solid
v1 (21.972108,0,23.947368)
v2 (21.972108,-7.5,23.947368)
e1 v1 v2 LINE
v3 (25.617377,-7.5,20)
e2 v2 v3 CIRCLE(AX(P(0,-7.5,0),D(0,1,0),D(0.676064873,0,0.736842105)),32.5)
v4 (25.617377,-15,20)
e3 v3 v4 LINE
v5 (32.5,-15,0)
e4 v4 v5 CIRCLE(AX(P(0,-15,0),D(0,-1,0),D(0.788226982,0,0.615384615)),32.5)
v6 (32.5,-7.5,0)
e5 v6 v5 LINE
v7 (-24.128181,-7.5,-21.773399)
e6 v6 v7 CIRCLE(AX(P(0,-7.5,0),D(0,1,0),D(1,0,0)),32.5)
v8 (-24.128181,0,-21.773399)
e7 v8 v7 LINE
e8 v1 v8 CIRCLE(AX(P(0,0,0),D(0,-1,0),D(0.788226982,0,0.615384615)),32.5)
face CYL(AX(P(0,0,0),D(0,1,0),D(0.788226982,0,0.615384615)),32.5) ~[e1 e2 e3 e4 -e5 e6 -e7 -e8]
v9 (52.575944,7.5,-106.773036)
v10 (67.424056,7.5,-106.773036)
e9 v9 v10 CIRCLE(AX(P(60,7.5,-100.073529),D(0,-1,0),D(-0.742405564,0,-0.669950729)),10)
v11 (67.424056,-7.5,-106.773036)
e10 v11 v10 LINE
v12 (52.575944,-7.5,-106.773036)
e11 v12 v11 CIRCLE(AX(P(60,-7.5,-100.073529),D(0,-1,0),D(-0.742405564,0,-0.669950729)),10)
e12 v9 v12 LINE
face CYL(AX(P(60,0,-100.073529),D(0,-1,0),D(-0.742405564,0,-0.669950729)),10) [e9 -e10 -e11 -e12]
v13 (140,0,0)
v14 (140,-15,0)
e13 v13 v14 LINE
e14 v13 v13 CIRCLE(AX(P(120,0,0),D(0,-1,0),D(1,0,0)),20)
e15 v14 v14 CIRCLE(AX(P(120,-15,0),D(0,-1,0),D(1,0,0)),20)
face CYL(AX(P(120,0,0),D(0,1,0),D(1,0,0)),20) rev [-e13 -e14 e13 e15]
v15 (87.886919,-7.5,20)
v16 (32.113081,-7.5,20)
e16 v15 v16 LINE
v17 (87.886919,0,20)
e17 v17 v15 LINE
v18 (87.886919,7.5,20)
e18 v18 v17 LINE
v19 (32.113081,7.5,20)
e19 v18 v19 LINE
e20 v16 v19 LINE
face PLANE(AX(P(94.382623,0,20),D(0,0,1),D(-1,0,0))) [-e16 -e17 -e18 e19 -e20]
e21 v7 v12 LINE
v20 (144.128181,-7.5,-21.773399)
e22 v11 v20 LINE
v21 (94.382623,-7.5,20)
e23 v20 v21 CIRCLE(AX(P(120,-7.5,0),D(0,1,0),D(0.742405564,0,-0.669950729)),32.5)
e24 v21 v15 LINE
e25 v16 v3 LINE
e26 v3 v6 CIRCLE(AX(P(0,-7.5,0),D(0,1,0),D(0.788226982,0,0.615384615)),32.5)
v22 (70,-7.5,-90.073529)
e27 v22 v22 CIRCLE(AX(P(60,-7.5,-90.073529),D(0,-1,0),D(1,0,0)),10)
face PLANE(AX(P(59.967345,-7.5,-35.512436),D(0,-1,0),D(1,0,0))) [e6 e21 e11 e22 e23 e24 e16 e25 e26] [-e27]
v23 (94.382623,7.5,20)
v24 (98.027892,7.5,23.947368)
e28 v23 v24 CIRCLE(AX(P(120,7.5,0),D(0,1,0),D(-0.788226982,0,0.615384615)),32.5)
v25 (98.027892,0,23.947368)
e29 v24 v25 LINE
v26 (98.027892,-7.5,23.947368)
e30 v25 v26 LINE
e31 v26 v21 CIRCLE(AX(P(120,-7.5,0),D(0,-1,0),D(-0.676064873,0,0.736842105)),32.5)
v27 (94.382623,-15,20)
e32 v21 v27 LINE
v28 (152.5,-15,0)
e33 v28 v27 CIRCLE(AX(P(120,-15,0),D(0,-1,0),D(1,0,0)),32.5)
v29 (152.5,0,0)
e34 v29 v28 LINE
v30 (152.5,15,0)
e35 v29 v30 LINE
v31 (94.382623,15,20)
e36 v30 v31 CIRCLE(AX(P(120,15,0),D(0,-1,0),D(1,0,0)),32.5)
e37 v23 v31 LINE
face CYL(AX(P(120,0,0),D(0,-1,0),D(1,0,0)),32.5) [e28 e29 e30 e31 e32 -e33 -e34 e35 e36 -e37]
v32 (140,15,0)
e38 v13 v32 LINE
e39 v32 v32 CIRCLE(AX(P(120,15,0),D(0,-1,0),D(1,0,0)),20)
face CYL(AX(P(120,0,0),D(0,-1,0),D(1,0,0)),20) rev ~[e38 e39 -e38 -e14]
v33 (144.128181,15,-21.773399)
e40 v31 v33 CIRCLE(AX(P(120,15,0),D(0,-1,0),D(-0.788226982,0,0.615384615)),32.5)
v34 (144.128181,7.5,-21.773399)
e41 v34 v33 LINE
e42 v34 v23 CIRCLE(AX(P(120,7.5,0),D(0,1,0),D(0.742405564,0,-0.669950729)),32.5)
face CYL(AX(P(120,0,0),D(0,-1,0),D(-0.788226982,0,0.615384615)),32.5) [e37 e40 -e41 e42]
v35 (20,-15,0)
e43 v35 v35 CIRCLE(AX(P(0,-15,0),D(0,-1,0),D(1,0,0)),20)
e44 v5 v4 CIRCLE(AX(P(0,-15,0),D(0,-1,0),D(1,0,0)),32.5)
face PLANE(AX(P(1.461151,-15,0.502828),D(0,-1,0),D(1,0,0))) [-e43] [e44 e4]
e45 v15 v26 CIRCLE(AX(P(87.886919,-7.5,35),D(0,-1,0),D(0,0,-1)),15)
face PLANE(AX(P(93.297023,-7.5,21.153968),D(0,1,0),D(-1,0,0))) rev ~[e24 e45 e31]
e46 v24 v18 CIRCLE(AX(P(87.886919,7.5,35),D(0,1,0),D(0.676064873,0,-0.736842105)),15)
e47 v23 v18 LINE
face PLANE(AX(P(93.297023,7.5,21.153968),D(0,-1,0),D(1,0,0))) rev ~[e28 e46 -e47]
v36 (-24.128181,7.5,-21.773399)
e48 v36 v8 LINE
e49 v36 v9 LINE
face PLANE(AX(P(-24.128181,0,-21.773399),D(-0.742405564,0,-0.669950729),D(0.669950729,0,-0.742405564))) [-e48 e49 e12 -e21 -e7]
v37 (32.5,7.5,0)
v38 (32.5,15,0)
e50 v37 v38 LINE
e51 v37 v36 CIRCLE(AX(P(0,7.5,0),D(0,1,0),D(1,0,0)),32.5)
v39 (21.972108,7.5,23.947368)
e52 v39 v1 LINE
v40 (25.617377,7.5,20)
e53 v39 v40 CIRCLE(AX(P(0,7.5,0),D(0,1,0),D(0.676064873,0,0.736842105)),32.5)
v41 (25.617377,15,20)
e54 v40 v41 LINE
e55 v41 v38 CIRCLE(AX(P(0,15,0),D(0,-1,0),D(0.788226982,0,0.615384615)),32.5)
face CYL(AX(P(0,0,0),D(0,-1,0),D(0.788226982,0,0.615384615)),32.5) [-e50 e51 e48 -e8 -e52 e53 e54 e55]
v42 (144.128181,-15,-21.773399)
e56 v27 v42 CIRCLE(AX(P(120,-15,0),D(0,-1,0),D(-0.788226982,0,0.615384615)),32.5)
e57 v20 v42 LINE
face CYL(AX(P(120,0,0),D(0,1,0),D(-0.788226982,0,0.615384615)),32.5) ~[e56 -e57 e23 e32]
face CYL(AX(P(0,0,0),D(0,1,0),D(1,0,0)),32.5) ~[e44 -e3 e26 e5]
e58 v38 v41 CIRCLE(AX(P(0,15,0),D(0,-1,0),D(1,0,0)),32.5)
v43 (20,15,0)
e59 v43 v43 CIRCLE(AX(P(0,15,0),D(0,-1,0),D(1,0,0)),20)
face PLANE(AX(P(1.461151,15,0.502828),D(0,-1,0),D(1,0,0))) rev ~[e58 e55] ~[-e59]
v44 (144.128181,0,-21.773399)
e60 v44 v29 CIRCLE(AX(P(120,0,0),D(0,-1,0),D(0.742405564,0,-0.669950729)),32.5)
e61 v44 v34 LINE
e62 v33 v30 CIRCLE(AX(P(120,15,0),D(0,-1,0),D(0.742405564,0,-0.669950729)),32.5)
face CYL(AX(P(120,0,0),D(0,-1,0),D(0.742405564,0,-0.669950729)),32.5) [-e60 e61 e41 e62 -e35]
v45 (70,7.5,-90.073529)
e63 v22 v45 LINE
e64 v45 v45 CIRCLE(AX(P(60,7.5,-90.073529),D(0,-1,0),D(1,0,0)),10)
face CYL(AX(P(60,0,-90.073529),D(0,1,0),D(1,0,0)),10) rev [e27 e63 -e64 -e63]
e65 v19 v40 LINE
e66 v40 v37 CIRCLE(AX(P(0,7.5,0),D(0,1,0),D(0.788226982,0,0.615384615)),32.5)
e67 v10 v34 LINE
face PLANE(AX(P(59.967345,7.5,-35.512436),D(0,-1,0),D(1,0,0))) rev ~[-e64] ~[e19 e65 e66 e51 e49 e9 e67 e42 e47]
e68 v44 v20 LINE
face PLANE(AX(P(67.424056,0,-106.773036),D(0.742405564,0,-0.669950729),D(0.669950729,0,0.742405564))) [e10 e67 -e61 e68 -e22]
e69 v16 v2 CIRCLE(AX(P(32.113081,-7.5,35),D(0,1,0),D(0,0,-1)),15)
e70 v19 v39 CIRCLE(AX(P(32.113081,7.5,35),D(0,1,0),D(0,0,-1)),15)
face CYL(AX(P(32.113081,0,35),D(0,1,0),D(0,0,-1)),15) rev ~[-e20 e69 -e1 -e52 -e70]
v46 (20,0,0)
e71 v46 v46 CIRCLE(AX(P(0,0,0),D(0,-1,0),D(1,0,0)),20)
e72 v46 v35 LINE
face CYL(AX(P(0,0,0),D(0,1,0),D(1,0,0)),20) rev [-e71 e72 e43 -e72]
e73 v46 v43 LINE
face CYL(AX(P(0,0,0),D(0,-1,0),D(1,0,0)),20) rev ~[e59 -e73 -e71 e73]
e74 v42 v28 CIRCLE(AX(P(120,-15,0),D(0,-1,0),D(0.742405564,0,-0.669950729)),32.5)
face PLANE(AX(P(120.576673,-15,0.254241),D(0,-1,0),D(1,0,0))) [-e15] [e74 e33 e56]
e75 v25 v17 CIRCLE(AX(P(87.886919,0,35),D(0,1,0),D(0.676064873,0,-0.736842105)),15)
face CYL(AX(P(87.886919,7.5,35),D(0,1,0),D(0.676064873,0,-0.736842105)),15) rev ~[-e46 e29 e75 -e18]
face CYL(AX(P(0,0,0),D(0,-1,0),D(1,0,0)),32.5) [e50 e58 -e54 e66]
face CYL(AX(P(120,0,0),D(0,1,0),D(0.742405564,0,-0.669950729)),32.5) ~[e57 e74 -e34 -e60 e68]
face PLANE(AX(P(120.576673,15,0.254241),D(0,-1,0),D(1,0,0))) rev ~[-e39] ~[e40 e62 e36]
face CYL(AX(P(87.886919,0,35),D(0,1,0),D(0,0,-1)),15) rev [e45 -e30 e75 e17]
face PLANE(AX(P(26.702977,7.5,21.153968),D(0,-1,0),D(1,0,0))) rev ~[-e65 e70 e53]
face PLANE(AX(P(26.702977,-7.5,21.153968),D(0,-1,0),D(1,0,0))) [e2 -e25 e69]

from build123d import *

# Parameters (mm, degrees)
F0_R        = 20
F1_DEPTH    = 15
F0_R_2      = 10
F2_DEPTH    = 7.5
F3_T1_DEPTH = 7.5
F3_T3_DEPTH = 7.5


# Not quite as in the source:
# - a fillet or chamfer that OpenCascade refuses, or shapes differently, is made with other operations: its cross-section is extruded or revolved along the edge and cut away or added


with BuildPart() as f1:
    # F0 (on Front) → F1 (new body, symmetric)
    with BuildSketch(Plane.XZ):
        with BuildLine():
            ThreePointArc((-24.128180818, -21.7733986877), (11.6637070311, -30.3349293438), (32.5, 0))
            ThreePointArc((32.5, 0), (30.7312117377, 10.5755673669), (25.6173769149, 20))
            ThreePointArc((25.6173769149, 20), (-20.899967362, 24.8885789925), (-24.128180818, -21.7733986877))
        make_face()
        Circle(F0_R, mode=Mode.SUBTRACT)
    extrude(amount=F1_DEPTH, both=True)



with BuildPart() as f1b:
    # F0 (on Front) → F1, piece 2 (new body, symmetric)
    with BuildSketch(Plane.XZ):
        with BuildLine():
            ThreePointArc((152.5, 0), (130.5755673669, 30.7312117377), (94.3826230851, 20))
            ThreePointArc((94.3826230851, 20), (99.100032638, -24.8885789925), (144.128180818, -21.7733986877))
            ThreePointArc((144.128180818, -21.7733986877), (150.3349293438, -11.6637070311), (152.5, 0))
        make_face()
        with Locations((120, 0)):
            Circle(F0_R, mode=Mode.SUBTRACT)
    extrude(amount=F1_DEPTH, both=True)


with BuildPart() as f1_1:
    add(f1.part)

    add(f1b.part)  # F2 merges F1b
    # F0 (on Front) → F2 (join, symmetric)
    with BuildSketch(Plane.XZ):
        with BuildLine():
            ThreePointArc((25.6173769149, 20), (30.7312117377, 10.5755673669), (32.5, 0))
            ThreePointArc((32.5, 0), (11.6637070311, -30.3349293438), (-24.128180818, -21.7733986877))
            Line((-24.128180818, -21.7733986877), (52.5759443637, -106.773036476))
            ThreePointArc((52.5759443637, -106.773036476), (60, -110.0735291875), (67.4240556363, -106.773036476))
            Line((67.4240556363, -106.773036476), (144.128180818, -21.7733986877))
            ThreePointArc((144.128180818, -21.7733986877), (99.100032638, -24.8885789925), (94.3826230851, 20))
            Line((94.3826230851, 20), (25.6173769149, 20))
        make_face()
        with Locations((60, -90.0735291875)):
            Circle(F0_R_2, mode=Mode.SUBTRACT)
    extrude(amount=F2_DEPTH, both=True)

    # F3: fillet of radius 15 on 4 edges, made by hand

    # F3_s2 → F3_t1 (join)
    with BuildSketch(Plane.XZ.offset(-7.5)):
        with BuildLine():
            ThreePointArc((32.1130814467, 20), (26.6720095708, 21.0216332556), (21.9721083582, 23.9473684211))
            ThreePointArc((21.9721083582, 23.9473684211), (23.8764571598, 22.0491449607), (25.6173769149, 20))
            Line((25.6173769149, 20), (32.1130814467, 20))
        make_face()
        with BuildLine():
            ThreePointArc((98.0278916418, 23.9473684211), (93.3279904292, 21.0216332556), (87.8869185533, 20))
            Line((87.8869185533, 20), (94.3826230851, 20))
            ThreePointArc((94.3826230851, 20), (96.1235428402, 22.0491449607), (98.0278916418, 23.9473684211))
        make_face()
    extrude(amount=F3_T1_DEPTH)

    # F3_s4 → F3_t3 (join)
    with BuildSketch(Plane.XZ):
        with BuildLine():
            ThreePointArc((32.1130814467, 20), (26.6720095708, 21.0216332556), (21.9721083582, 23.9473684211))
            ThreePointArc((21.9721083582, 23.9473684211), (23.8764571598, 22.0491449607), (25.6173769149, 20))
            Line((25.6173769149, 20), (32.1130814467, 20))
        make_face()
        with BuildLine():
            ThreePointArc((87.8869185533, 20), (93.3279904292, 21.0216332556), (98.0278916418, 23.9473684211))
            ThreePointArc((98.0278916418, 23.9473684211), (96.1235428402, 22.0491449607), (94.3826230851, 20))
            Line((94.3826230851, 20), (87.8869185533, 20))
        make_face()
    extrude(amount=F3_T3_DEPTH)


solid = f1_1.part
